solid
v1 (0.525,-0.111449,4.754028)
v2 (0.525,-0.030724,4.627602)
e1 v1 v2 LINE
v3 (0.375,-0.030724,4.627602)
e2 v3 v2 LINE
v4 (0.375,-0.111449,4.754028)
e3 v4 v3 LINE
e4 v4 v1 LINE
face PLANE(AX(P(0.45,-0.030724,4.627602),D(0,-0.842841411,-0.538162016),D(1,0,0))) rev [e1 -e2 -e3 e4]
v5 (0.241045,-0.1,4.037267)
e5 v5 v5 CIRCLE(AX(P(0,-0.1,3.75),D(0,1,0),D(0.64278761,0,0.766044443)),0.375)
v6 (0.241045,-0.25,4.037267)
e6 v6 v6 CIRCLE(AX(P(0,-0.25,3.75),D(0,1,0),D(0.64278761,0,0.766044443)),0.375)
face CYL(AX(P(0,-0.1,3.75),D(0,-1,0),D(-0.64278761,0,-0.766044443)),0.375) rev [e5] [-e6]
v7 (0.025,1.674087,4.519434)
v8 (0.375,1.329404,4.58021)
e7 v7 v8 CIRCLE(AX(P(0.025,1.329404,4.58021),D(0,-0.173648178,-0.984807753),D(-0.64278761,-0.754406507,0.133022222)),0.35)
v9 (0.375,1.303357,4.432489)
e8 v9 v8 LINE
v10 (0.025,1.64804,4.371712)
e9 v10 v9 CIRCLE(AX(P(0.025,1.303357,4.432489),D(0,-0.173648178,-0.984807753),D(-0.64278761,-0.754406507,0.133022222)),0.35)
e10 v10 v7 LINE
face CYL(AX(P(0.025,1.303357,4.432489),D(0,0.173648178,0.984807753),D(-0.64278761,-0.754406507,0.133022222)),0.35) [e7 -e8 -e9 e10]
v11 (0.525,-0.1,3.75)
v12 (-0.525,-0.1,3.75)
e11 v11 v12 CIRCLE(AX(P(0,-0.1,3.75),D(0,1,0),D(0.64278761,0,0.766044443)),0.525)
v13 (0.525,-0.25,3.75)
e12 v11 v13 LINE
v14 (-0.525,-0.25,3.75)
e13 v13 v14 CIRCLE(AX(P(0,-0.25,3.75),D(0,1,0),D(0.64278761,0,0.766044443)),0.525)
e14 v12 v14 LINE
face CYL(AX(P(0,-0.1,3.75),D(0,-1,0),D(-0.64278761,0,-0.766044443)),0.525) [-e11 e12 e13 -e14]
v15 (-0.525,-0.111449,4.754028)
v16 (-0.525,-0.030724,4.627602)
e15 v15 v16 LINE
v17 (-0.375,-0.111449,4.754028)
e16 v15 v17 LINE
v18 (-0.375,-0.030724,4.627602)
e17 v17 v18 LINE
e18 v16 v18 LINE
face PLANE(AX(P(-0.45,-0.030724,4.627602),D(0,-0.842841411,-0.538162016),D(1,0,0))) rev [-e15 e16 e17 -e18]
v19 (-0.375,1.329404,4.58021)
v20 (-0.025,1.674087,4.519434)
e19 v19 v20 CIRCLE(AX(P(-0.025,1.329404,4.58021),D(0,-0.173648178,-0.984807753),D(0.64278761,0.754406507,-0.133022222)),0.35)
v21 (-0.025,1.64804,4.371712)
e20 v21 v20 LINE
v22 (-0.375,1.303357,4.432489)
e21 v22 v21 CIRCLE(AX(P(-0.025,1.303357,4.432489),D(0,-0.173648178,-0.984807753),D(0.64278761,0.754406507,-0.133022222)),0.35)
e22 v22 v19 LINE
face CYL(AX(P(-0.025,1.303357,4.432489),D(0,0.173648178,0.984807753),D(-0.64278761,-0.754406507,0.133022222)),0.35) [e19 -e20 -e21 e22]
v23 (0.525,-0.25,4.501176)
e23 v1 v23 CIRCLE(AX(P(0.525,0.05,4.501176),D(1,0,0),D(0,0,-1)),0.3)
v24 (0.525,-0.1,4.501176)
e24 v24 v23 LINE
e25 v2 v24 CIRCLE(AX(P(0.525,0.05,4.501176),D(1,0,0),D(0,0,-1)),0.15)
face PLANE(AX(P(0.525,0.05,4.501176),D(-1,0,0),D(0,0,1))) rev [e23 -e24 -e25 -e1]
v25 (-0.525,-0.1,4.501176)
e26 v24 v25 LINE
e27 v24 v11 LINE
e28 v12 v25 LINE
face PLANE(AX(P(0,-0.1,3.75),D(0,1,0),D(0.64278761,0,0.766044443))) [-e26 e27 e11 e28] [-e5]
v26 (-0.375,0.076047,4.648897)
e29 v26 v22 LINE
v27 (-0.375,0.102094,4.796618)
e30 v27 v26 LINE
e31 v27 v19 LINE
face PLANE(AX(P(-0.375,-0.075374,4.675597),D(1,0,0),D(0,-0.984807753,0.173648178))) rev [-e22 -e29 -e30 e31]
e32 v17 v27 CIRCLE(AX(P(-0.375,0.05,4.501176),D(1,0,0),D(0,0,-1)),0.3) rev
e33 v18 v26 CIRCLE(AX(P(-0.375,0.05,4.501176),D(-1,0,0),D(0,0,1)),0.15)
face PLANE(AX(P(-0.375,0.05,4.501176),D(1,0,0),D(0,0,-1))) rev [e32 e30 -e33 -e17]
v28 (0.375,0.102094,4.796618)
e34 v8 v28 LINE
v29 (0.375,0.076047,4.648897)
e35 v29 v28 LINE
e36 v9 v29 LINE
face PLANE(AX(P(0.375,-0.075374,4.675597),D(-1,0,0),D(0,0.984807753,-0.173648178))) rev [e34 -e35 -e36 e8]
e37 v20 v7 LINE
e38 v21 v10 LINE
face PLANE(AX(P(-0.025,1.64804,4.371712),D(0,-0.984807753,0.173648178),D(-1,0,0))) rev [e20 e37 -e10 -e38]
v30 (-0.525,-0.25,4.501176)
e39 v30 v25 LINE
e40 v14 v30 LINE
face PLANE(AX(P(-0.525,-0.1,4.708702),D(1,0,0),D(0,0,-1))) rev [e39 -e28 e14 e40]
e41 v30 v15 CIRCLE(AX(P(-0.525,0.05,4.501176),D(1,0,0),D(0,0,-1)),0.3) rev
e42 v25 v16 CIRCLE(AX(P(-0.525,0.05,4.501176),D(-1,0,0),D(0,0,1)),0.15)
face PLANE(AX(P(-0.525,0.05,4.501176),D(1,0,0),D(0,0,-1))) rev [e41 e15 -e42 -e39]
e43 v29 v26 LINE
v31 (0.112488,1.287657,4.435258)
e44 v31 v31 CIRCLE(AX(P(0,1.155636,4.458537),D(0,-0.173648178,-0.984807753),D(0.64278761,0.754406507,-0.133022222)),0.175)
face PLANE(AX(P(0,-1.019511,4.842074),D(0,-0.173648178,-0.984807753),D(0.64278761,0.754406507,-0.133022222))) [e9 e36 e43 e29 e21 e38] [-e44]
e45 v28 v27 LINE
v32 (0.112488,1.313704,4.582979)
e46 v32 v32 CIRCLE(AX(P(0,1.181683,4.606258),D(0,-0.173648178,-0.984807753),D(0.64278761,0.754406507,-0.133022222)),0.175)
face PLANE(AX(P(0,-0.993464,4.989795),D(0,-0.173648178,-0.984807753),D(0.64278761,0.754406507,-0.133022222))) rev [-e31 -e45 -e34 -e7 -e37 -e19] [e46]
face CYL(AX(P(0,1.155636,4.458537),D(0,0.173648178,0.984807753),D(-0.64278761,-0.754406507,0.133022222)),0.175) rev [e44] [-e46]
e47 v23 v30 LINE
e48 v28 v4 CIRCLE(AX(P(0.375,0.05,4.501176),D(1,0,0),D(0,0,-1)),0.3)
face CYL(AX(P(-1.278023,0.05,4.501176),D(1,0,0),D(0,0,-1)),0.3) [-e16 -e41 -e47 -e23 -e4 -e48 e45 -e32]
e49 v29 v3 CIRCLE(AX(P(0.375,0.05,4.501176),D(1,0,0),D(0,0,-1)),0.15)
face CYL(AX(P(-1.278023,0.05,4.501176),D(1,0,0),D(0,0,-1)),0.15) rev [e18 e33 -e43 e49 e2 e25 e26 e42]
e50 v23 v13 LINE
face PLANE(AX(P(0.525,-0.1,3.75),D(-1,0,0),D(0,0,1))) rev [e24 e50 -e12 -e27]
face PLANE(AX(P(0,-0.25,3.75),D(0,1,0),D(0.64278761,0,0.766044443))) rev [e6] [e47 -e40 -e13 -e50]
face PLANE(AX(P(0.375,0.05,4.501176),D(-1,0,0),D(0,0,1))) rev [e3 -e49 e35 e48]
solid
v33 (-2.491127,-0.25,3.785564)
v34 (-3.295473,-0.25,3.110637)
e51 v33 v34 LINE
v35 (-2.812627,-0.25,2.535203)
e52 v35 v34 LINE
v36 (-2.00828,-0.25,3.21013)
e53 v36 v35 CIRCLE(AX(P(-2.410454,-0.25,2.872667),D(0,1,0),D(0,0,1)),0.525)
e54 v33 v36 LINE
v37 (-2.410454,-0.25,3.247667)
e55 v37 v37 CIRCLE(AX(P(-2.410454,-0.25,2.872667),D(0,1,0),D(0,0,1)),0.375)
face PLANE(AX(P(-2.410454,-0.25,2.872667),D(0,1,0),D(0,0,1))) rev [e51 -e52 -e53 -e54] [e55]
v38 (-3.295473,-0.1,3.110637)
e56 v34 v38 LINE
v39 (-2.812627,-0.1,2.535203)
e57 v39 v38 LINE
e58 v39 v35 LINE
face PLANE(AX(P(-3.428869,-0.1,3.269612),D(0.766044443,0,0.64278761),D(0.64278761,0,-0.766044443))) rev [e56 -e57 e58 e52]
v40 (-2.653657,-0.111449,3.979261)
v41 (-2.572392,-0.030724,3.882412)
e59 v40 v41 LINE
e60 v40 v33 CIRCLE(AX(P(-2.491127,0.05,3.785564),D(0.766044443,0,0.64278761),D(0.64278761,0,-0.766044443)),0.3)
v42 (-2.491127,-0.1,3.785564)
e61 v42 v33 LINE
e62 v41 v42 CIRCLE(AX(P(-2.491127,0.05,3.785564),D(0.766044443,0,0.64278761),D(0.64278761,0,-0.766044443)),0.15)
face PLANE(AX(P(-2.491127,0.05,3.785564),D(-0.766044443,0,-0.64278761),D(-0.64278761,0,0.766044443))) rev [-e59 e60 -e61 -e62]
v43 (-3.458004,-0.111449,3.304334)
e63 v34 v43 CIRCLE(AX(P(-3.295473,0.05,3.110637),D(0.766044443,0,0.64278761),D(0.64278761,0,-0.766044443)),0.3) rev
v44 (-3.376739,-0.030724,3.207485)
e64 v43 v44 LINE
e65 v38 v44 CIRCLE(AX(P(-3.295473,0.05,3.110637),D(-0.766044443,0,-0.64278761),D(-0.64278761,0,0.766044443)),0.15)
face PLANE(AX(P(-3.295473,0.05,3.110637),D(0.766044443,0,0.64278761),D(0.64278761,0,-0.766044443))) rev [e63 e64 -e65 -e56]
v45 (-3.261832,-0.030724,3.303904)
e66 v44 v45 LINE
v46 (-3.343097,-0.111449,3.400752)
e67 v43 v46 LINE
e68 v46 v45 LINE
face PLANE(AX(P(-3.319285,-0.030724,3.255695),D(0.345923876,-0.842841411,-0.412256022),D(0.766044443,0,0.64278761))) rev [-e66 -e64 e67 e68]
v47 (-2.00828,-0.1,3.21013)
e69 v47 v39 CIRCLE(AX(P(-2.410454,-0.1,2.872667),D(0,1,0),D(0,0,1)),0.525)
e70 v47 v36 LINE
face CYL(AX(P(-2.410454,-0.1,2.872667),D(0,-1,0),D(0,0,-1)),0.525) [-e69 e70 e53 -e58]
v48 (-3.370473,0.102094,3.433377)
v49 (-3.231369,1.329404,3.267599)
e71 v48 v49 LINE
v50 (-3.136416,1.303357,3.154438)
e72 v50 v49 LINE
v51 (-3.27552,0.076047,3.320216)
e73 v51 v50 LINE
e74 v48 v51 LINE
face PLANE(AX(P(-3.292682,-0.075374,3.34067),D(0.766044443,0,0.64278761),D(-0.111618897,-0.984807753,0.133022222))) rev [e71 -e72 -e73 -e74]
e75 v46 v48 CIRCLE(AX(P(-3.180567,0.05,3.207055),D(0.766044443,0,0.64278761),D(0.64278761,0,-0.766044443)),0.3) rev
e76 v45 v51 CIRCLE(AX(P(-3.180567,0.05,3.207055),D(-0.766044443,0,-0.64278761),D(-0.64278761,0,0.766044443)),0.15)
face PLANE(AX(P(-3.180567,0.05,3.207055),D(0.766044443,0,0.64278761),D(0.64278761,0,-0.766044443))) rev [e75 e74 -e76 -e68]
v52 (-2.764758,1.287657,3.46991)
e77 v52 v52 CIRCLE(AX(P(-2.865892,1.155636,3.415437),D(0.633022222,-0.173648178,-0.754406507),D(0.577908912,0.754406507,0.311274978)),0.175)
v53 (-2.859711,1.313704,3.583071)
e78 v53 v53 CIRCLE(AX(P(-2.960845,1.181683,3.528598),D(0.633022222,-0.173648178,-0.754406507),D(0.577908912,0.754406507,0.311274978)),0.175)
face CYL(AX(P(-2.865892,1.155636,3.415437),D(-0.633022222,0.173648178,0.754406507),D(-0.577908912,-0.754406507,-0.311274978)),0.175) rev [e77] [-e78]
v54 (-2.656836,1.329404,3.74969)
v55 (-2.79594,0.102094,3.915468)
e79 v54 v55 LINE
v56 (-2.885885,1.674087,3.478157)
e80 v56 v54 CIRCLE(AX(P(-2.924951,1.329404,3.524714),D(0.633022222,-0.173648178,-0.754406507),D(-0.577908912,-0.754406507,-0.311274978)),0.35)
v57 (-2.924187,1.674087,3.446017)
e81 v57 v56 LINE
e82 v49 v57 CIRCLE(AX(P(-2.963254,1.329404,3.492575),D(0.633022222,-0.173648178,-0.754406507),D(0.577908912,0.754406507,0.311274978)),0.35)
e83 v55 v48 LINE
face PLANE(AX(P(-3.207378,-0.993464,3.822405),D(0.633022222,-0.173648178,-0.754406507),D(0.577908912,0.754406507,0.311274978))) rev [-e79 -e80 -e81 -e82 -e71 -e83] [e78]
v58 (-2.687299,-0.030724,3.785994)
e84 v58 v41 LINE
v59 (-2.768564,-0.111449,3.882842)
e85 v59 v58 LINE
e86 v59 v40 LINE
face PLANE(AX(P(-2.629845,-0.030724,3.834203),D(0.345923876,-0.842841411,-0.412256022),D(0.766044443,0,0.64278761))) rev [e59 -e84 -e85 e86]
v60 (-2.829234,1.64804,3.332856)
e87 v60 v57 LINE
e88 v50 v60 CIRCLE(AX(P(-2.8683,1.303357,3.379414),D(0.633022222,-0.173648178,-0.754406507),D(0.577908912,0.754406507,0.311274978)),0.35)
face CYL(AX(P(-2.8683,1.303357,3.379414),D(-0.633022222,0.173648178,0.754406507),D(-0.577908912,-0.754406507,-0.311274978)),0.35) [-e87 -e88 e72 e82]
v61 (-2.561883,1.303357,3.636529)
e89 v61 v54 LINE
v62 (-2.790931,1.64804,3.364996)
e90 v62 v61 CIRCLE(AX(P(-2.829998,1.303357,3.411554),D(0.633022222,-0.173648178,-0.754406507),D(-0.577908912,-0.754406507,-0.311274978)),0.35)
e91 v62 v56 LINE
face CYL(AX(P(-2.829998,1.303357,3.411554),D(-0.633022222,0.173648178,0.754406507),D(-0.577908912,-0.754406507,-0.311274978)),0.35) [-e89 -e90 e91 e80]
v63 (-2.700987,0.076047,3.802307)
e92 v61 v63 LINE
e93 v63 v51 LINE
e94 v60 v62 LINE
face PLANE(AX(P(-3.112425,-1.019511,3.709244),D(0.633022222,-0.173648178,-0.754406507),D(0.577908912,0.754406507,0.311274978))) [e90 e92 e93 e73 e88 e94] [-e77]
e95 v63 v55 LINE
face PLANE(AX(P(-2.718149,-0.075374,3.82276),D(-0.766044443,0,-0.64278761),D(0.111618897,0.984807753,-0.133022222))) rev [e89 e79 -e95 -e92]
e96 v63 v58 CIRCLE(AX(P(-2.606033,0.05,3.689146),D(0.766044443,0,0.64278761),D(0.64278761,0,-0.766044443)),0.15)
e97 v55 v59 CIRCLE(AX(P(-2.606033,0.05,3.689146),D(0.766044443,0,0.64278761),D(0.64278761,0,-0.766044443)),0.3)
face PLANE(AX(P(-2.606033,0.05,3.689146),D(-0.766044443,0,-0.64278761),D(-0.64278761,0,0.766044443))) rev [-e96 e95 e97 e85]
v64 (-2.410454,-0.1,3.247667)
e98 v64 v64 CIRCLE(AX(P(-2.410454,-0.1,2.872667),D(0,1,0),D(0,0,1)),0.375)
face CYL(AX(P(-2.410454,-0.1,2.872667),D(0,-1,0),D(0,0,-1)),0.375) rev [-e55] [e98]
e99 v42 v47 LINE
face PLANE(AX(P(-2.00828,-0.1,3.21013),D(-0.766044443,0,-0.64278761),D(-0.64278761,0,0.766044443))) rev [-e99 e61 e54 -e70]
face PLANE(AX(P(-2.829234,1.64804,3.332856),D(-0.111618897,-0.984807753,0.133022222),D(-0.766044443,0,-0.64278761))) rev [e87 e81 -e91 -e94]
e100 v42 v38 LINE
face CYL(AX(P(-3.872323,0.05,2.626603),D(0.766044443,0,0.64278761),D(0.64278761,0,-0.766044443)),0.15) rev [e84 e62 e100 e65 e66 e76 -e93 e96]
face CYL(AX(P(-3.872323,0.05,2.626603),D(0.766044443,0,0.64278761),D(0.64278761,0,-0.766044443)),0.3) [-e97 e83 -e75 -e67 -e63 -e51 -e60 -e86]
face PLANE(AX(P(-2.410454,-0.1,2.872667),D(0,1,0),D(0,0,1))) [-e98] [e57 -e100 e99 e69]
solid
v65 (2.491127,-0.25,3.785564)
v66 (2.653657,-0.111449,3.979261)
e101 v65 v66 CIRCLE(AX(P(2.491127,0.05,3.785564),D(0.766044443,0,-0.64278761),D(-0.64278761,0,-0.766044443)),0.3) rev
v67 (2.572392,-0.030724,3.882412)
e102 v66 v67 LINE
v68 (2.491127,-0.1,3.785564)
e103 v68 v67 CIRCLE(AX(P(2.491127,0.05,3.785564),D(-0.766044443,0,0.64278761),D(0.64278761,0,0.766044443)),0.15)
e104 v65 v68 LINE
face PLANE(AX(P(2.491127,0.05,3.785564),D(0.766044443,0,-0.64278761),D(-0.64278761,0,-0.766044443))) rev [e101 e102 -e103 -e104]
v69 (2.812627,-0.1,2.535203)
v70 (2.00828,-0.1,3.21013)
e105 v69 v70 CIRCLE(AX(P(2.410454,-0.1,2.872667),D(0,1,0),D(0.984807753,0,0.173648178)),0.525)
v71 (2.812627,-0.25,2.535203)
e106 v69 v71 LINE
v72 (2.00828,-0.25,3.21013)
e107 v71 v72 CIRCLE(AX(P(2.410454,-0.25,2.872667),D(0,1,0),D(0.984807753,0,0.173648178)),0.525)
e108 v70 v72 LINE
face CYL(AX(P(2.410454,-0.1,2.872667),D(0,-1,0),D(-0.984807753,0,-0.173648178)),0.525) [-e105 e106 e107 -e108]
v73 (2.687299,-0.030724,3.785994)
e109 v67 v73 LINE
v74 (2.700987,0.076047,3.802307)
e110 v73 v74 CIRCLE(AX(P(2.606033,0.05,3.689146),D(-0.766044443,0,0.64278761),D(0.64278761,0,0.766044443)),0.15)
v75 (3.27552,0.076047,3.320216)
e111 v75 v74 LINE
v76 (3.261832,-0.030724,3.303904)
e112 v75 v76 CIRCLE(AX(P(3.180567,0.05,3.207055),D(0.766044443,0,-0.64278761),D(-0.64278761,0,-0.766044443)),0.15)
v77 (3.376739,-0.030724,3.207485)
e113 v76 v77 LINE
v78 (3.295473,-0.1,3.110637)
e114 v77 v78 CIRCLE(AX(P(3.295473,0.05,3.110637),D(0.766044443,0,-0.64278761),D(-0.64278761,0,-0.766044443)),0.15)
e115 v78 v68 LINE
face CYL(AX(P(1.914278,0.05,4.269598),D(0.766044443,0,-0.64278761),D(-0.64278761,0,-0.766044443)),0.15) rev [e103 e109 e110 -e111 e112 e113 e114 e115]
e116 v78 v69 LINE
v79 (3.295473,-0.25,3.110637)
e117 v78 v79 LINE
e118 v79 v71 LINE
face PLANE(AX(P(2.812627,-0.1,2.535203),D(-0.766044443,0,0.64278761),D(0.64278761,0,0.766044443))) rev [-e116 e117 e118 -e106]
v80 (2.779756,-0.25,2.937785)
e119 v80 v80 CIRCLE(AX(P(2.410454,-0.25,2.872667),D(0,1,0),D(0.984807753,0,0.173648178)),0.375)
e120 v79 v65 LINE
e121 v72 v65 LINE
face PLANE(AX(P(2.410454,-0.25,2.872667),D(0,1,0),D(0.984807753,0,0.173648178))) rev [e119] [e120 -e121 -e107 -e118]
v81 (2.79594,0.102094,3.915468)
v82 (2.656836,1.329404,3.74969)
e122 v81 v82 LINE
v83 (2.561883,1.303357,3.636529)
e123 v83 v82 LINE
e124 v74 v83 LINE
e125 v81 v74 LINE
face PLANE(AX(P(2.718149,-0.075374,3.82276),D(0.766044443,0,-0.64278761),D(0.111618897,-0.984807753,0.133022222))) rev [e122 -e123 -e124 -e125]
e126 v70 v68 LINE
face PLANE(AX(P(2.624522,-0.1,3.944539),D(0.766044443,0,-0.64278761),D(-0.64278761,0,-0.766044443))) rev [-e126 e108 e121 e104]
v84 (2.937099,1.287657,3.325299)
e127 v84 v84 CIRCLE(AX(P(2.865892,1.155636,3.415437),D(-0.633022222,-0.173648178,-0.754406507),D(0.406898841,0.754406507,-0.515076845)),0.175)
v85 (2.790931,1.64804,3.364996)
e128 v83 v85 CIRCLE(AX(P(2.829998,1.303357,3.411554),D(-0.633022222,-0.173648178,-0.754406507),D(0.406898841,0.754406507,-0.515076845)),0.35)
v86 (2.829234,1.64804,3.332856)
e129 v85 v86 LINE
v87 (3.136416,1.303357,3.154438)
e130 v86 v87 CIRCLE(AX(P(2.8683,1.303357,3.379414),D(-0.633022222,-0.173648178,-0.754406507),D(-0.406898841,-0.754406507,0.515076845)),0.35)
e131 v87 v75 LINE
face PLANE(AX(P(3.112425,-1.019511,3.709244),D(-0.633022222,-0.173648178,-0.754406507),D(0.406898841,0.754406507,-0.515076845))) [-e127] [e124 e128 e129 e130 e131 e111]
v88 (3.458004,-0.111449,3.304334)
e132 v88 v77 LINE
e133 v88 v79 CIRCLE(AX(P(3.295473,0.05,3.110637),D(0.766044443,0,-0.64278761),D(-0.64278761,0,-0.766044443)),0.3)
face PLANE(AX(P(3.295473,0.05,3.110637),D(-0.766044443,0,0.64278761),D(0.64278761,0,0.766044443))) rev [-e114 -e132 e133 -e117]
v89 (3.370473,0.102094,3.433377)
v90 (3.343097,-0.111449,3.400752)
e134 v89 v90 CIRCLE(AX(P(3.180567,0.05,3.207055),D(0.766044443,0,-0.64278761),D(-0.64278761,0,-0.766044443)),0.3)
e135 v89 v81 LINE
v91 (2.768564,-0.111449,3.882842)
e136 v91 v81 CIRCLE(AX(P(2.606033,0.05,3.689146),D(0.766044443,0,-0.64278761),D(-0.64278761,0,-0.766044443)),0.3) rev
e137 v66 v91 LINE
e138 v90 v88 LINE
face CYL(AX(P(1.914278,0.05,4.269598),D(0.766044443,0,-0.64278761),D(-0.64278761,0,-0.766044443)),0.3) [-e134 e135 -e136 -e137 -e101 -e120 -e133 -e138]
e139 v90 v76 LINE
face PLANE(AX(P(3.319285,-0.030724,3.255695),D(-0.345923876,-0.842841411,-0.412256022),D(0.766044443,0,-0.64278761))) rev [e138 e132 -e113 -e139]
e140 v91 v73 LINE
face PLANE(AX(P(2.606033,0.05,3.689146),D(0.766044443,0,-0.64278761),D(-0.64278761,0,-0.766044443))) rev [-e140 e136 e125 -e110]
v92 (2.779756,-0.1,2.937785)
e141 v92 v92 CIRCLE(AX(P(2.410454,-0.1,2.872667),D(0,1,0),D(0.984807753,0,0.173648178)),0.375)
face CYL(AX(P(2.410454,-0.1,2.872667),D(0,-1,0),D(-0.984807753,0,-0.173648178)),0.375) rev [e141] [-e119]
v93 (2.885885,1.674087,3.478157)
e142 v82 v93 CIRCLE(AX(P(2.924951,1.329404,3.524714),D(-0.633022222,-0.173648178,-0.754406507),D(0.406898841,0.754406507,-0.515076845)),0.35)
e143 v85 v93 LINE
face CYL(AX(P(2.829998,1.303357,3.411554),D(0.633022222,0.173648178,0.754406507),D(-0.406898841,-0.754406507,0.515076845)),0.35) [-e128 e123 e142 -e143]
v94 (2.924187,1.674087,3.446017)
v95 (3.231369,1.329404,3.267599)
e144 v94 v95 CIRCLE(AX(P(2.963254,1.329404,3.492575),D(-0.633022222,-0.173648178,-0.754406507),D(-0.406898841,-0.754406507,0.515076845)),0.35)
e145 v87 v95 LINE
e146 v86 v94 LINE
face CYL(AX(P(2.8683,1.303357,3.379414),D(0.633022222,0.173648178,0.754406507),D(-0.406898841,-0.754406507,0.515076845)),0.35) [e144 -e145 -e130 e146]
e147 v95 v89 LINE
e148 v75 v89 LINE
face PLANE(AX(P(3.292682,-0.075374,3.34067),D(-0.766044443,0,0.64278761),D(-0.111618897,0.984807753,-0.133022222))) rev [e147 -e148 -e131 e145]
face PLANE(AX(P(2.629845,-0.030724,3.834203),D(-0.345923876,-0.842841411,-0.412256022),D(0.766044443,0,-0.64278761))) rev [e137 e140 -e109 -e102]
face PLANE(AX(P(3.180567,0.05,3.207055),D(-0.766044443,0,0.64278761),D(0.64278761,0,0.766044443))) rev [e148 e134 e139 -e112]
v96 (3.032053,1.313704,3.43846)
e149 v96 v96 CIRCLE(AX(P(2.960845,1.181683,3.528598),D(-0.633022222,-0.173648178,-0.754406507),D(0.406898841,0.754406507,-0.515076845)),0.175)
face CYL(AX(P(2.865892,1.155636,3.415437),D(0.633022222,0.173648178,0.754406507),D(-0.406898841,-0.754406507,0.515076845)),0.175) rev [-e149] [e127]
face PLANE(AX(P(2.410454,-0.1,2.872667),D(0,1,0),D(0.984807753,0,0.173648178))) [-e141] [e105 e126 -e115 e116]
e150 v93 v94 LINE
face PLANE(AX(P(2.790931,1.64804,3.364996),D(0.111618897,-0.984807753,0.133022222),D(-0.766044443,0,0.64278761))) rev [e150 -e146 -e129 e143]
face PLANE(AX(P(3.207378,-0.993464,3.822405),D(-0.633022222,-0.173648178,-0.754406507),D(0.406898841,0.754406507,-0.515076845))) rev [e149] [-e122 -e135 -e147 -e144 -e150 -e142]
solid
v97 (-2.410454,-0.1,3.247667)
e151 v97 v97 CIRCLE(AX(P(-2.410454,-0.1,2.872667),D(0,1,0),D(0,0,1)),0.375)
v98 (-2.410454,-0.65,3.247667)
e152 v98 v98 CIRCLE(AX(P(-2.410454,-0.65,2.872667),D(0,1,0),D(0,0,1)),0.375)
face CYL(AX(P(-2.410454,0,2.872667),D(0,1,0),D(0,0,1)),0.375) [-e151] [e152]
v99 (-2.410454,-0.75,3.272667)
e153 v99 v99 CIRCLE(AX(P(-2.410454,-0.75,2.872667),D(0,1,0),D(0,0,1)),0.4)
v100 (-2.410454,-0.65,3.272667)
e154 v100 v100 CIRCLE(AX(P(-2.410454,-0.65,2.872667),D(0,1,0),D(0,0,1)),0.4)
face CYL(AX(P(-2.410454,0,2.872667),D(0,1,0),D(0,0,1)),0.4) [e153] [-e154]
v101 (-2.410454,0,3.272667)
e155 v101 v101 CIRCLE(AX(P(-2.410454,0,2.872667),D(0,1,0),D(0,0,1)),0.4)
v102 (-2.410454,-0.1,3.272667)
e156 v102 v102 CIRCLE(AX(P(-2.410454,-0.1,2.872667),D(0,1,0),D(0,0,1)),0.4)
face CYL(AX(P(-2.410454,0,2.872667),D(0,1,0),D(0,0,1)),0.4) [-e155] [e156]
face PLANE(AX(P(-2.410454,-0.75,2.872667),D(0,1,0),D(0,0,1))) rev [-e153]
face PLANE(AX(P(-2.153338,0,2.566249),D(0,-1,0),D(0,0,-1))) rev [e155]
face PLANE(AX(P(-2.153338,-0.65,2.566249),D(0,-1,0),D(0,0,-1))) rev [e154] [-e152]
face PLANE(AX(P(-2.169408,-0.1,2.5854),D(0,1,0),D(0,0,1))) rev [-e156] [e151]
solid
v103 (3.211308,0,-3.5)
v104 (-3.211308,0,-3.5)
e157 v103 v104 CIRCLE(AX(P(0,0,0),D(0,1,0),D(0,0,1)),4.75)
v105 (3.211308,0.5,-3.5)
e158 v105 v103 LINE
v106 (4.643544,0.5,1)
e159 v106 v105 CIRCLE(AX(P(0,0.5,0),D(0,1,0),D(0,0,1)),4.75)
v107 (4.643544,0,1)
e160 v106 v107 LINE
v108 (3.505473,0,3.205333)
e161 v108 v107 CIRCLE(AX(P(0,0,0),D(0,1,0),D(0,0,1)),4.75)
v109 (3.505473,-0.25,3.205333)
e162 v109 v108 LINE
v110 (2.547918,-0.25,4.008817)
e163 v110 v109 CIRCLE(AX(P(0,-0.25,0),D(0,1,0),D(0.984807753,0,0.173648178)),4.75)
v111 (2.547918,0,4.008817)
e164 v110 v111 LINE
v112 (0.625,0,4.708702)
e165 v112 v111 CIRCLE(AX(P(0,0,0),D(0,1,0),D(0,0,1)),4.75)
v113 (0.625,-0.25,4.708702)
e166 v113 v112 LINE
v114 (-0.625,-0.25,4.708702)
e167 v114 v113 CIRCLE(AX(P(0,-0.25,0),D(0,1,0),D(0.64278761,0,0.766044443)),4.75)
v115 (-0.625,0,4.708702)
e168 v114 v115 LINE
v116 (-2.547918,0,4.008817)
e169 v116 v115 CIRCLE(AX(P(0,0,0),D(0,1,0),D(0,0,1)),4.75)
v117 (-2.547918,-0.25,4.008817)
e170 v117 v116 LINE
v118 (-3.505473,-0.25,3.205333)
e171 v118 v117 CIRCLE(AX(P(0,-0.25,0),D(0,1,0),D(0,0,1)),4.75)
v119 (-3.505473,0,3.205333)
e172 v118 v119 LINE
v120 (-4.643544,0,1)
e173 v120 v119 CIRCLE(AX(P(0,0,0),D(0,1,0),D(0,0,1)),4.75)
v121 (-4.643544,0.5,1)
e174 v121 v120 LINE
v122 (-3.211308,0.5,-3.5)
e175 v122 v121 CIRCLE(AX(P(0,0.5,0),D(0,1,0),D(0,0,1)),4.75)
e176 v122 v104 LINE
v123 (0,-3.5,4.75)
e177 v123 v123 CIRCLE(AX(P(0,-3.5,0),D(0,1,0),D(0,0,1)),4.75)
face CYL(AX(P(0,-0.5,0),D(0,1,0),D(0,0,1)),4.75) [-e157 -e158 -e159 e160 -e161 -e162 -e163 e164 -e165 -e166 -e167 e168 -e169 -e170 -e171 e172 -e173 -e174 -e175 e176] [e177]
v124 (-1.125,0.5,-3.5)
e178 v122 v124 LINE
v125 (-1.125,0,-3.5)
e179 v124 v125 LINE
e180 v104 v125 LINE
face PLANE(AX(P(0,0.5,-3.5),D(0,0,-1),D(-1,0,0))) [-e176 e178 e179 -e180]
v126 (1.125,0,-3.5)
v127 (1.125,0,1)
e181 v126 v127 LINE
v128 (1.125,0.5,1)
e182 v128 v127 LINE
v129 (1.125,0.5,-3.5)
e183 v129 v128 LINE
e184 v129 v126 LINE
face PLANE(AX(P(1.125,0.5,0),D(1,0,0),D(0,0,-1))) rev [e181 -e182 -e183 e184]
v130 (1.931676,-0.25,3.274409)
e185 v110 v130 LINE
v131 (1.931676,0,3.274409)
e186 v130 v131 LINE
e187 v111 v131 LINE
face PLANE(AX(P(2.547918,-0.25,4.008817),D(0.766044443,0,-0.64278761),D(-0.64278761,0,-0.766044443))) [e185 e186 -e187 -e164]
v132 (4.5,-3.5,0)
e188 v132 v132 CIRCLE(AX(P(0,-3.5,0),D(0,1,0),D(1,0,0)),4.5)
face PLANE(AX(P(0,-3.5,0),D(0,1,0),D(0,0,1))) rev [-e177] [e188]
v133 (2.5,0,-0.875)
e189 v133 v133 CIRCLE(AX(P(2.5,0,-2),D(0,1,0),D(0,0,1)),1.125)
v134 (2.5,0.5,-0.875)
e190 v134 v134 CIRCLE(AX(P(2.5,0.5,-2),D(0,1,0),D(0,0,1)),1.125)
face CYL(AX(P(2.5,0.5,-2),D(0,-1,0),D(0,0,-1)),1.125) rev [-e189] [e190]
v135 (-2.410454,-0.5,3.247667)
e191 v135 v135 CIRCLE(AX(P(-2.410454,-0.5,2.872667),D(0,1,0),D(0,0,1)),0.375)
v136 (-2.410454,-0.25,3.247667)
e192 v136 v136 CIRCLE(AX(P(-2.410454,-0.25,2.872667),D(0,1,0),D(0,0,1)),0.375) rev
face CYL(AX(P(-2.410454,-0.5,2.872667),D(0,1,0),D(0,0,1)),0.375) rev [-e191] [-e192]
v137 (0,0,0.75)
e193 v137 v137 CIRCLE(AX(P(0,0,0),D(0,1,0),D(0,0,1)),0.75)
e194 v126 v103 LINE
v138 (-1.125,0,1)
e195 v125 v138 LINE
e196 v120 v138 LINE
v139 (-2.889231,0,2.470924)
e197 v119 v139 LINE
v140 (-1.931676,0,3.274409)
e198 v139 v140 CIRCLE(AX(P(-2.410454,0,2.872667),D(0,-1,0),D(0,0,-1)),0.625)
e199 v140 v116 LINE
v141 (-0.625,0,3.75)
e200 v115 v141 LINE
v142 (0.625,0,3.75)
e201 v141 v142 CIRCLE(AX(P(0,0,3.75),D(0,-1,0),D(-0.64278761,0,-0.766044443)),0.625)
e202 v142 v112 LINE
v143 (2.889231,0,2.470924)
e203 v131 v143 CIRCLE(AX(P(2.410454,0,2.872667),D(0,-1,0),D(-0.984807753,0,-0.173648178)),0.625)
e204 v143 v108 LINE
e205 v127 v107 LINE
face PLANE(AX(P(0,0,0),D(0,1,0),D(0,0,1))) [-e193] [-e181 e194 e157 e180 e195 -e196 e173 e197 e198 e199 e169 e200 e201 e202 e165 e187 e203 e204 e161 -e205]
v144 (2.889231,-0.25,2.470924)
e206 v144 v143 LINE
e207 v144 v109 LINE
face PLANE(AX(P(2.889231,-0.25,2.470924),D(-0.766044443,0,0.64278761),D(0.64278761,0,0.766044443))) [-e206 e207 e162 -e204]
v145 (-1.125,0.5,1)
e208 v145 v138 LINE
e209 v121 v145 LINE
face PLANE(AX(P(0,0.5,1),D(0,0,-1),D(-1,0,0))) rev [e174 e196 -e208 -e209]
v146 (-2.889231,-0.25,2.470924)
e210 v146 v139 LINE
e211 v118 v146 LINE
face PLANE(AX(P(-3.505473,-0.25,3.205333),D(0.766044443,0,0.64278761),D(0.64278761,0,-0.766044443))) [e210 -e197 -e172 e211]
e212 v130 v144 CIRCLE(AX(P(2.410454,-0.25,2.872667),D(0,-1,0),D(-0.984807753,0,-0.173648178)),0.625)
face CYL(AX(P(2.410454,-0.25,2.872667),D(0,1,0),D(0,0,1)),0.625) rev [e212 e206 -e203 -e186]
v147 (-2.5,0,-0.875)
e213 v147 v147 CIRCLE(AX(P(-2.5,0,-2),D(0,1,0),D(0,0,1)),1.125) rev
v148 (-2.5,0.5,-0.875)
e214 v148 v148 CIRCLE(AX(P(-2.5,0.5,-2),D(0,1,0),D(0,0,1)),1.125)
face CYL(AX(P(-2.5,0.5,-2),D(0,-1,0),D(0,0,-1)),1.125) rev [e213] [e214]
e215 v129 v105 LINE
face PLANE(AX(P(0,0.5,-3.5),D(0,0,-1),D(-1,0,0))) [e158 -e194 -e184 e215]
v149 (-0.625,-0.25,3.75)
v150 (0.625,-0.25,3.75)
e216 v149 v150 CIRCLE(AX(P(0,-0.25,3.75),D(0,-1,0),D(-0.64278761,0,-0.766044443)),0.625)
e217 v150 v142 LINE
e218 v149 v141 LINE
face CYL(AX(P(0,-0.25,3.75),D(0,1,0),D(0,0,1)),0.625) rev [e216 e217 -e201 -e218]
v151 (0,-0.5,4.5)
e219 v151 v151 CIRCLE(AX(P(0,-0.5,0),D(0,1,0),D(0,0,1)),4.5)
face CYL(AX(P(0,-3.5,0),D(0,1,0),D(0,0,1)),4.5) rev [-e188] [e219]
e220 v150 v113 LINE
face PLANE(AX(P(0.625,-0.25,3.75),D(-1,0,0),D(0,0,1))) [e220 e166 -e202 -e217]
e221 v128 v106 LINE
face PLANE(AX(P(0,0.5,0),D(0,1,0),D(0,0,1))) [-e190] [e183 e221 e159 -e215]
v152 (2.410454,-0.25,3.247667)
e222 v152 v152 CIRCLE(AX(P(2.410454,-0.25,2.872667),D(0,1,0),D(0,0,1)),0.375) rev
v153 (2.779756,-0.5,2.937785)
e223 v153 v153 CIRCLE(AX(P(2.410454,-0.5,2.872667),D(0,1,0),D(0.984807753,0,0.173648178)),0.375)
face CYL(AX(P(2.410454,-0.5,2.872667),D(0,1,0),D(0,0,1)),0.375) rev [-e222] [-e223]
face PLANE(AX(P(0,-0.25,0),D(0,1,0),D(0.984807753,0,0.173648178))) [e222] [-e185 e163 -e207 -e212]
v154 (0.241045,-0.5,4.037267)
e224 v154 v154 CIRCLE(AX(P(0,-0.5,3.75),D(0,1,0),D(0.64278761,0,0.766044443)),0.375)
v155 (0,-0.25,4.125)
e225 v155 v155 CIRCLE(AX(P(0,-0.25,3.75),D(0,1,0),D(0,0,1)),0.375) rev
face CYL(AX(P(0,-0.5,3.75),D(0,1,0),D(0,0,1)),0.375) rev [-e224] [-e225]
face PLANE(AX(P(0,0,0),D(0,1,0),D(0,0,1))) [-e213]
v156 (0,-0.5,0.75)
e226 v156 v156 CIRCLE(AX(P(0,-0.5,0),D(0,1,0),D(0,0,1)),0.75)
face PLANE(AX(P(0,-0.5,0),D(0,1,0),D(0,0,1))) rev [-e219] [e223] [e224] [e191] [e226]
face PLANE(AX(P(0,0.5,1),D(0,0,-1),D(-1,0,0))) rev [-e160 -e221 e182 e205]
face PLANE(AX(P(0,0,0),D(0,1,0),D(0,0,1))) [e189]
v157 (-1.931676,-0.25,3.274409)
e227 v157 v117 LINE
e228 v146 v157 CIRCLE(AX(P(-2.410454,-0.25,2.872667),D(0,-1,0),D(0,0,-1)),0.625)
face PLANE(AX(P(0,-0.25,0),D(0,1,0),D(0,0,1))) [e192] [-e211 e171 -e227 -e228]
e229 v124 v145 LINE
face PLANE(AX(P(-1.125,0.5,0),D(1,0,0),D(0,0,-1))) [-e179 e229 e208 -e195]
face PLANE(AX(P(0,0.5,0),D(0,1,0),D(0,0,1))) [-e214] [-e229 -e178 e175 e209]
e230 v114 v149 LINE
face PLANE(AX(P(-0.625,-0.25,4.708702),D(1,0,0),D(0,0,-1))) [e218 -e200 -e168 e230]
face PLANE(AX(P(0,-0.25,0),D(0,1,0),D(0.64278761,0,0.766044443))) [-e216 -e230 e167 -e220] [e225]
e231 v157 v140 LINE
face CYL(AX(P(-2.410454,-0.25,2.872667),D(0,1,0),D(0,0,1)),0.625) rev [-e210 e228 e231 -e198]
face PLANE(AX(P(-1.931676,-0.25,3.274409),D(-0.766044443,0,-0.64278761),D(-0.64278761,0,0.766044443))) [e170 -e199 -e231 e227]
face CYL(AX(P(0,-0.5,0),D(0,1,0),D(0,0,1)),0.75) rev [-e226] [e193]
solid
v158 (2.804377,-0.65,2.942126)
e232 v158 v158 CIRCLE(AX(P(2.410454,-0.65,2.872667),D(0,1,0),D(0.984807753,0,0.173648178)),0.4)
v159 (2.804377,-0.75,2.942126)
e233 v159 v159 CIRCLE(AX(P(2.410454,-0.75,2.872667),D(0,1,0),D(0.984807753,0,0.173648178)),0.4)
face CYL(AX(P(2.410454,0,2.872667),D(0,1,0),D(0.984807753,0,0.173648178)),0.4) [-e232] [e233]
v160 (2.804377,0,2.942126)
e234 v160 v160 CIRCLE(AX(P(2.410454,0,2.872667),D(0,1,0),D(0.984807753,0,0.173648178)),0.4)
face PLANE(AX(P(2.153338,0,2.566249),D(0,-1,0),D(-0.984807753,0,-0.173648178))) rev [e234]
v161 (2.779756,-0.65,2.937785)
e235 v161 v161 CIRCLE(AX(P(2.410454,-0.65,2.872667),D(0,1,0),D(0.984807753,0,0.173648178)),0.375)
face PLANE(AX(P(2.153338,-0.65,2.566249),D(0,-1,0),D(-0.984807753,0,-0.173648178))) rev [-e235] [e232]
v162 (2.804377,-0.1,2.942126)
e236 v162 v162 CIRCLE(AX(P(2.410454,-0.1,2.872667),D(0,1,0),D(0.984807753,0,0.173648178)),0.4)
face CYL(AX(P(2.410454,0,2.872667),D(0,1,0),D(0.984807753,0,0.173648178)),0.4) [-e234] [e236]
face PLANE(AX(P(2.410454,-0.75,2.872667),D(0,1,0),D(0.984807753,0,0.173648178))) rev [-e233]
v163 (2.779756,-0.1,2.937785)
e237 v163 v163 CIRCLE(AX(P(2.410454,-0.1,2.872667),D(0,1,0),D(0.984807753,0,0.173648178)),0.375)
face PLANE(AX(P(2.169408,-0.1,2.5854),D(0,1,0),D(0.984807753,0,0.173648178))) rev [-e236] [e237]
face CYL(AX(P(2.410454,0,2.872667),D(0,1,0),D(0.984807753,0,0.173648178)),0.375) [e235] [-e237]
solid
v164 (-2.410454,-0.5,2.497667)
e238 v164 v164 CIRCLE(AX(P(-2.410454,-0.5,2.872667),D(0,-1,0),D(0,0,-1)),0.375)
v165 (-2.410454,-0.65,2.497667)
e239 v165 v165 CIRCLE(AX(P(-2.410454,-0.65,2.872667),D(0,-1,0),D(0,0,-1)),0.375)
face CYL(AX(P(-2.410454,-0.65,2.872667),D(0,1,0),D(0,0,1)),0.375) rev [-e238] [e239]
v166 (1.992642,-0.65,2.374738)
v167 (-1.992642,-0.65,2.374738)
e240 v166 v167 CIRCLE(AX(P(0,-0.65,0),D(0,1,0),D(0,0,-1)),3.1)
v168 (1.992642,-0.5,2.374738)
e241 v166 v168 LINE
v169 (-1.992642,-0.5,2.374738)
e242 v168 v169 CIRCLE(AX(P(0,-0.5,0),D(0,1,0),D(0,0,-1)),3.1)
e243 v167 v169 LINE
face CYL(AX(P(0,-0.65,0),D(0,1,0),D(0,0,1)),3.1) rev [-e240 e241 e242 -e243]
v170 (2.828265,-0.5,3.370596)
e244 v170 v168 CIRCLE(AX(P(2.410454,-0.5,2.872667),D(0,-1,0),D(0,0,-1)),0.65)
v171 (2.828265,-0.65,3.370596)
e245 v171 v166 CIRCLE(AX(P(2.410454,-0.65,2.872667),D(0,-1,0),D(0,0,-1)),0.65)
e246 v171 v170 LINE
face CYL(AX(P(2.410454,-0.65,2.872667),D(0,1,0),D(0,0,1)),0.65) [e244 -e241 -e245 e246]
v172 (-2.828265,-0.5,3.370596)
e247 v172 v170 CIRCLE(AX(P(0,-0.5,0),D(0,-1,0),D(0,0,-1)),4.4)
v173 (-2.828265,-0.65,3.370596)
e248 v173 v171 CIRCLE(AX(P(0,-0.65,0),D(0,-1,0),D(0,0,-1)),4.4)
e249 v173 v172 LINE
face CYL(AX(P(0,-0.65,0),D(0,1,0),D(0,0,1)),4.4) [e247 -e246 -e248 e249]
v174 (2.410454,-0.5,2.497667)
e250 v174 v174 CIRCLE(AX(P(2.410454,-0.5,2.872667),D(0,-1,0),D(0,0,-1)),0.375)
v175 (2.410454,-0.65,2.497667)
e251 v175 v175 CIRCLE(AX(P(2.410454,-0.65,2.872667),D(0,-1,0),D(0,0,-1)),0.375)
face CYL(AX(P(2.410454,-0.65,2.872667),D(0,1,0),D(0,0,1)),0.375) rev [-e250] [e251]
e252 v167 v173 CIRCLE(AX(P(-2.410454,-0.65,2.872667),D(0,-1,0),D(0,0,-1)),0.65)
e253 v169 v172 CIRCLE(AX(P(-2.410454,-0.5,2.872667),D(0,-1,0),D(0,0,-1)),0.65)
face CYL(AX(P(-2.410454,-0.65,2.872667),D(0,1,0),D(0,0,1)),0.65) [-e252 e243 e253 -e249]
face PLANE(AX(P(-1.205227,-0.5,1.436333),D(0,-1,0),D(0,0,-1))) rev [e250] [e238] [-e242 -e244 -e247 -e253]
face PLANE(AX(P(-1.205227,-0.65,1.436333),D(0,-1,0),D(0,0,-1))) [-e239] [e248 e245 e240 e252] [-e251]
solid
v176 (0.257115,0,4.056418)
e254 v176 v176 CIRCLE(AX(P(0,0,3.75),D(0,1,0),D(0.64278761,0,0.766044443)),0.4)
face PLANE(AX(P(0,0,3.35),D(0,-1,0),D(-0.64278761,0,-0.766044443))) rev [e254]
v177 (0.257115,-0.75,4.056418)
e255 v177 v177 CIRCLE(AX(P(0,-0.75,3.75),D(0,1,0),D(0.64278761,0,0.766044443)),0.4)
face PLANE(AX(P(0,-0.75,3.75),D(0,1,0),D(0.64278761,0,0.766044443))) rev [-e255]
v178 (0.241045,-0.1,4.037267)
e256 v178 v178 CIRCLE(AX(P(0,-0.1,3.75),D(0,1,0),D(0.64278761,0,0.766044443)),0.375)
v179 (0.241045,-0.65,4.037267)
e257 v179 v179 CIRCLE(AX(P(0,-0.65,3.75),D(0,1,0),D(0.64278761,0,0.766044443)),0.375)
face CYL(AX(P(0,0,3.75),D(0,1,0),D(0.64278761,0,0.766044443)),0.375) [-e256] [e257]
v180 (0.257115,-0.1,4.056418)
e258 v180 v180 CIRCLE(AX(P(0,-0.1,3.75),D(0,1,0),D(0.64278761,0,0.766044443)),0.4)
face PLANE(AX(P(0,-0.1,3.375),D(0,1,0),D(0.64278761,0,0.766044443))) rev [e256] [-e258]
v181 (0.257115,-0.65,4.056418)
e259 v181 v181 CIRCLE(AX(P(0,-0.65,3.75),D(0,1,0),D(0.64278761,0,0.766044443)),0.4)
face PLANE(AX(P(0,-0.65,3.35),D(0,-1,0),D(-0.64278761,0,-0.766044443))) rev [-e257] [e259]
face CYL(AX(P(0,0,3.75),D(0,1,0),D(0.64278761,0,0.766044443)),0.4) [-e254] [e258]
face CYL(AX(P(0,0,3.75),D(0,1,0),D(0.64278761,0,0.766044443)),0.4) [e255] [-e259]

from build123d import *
from build123d.topology import SkipClean

# Parameters (mm, degrees)
SKETCH1_R                  = 4.75
SKETCH1_R_2                = 0.75
BOSS_EXTRUDE1_DEPTH        = 0.5
BOSS_EXTRUDE2_START        = 0.5
SKETCH1_3_R                = 1.125
BOSS_EXTRUDE2_DEPTH        = 0.5
SKETCH2_R                  = 0.375
CUT_EXTRUDE1_DEPTH         = 7.736096793
CUT_EXTRUDE2_DEPTH         = 0.25
CIRPATTERN1_COUNT          = 3
CIRPATTERN1_ANGLE          = 80
EXTRUDE_THIN1_START        = -0.5
SKETCH1_4_R                = 4.75
SKETCH1_4_R_2              = 4.5
EXTRUDE_THIN1_DEPTH        = 3
BASE_FLANGE1_START         = 0.15
SKETCH4_R                  = 0.175
SKETCH4_R_2                = 0.375
BASE_FLANGE1_DEPTH         = 0.15
SKETCHED_START             = -0.525
SKETCHED_BEND2_DEPTH       = 1.05
SKETCHED_BEND2_2_DEPTH     = 1.05
SKETCHED_START_2           = -0.375
SKETCHED_BEND2_3_DEPTH     = 0.75
SKETCHED_START_3           = -4.741475404
SKETCHED_BEND2_4_OUTLINE_R = 0.175
SKETCHED_BEND2_4_DEPTH     = 0.149999999
SKETCH13_R                 = 0.375
BASE_FLANGE2_DEPTH         = 0.15
CIRPATTERN2_COUNT          = 3
CIRPATTERN2_ANGLE          = 80


with BuildPart() as part:
    # Sketch1 → Boss-Extrude1 (new body)
    with BuildSketch(Plane(origin=(0, 0, 0), x_dir=(1, 0, 0), z_dir=(0, 1, 0))):
        with Locations(Location((0, 0, 0), (0, 0, 270))):
            Circle(SKETCH1_R)
        with Locations(Location((0, 0, 0), (0, 0, 270))):
            Circle(SKETCH1_R_2, mode=Mode.SUBTRACT)
    extrude(amount=-BOSS_EXTRUDE1_DEPTH)

    # Sketch1<3> → Boss-Extrude2 (add)
    # profile 1 of 2: a face of its own
    with BuildSketch(Plane(origin=(0, 0, 0), x_dir=(1, 0, 0), z_dir=(0, 1, 0)).offset(BOSS_EXTRUDE2_START)):
        with BuildLine():
            Line((1.125, -1), (4.643543905, -1))
            ThreePointArc((4.643543905, -1), (4.723310997, -0.502825243), (4.75, 0))
            ThreePointArc((4.75, 0), (4.348345299, 1.911646713), (3.211308145, 3.5))
            Line((3.211308145, 3.5), (1.125, 3.5))
            Line((1.125, 3.5), (1.125, -1))
        make_face()
        with Locations(Location((2.5, 2, 0), (0, 0, 270))):
            Circle(SKETCH1_3_R, mode=Mode.SUBTRACT)
    # profile 2 of 2: a face of its own
    with BuildSketch(Plane(origin=(0, 0, 0), x_dir=(1, 0, 0), z_dir=(0, 1, 0)).offset(BOSS_EXTRUDE2_START)):
        with BuildLine():
            ThreePointArc((-3.211308145, 3.5), (-4.526276083, 1.440598771), (-4.643543905, -1))
            Line((-4.643543905, -1), (-1.125, -1))
            Line((-1.125, -1), (-1.125, 3.5))
            Line((-1.125, 3.5), (-3.211308145, 3.5))
        make_face()
        with Locations(Location((-2.5, 2, 0), (0, 0, 270))):
            Circle(SKETCH1_3_R, mode=Mode.SUBTRACT)
    extrude(amount=-BOSS_EXTRUDE2_DEPTH)

    # Sketch2 → Cut-Extrude1 (cut, through all)
    with BuildSketch(Plane(origin=(0, 0, 0), x_dir=(1, 0, 0), z_dir=(0, 1, 0))):
        with Locations(Location((-2.410453536, -2.872666662, 0), (0, 0, 270))):
            Circle(SKETCH2_R)
    cut_extrude1 = extrude(amount=-CUT_EXTRUDE1_DEPTH, mode=Mode.SUBTRACT)

    # Sketch2<3> → Cut-Extrude2 (cut)
    with BuildSketch(Plane(origin=(0, 0, 0), x_dir=(1, 0, 0), z_dir=(0, 1, 0))):
        with BuildLine():
            Line((-3.505473113, -3.205332784), (-2.889231313, -2.470924406))
            ThreePointArc((-2.889231313, -2.470924406), (-2.00871128, -2.393888885), (-1.931675759, -3.274408918))
            Line((-1.931675759, -3.274408918), (-2.547917559, -4.008817296))
            ThreePointArc((-2.547917559, -4.008817296), (-3.053241146, -3.638711105), (-3.505473113, -3.205332784))
        make_face()
    cut_extrude2 = extrude(amount=-CUT_EXTRUDE2_DEPTH, mode=Mode.SUBTRACT)

    # CirPattern1: Cut-Extrude1, Cut-Extrude2 ×3 about axis
    cirpattern1_axis = Axis((0, 0, 0), (0, 1, 0))
    add([cut_extrude1.rotate(cirpattern1_axis, i * CIRPATTERN1_ANGLE / (CIRPATTERN1_COUNT - 1)) for i in range(1, CIRPATTERN1_COUNT)], mode=Mode.SUBTRACT)
    add([cut_extrude2.rotate(cirpattern1_axis, i * CIRPATTERN1_ANGLE / (CIRPATTERN1_COUNT - 1)) for i in range(1, CIRPATTERN1_COUNT)], mode=Mode.SUBTRACT)

    # Sketch1<4> → Extrude-Thin1 (add)
    with BuildSketch(Plane(origin=(0, 0, 0), x_dir=(1, 0, 0), z_dir=(0, 1, 0)).offset(EXTRUDE_THIN1_START)):
        Circle(SKETCH1_4_R)
        Circle(SKETCH1_4_R_2, mode=Mode.SUBTRACT)
    extrude(amount=-EXTRUDE_THIN1_DEPTH)


with BuildPart() as body_2:
    # Base-Flange1: sheet metal written as solids
    # Sketch4 → Base-Flange1 (new body)
    with BuildSketch(Plane(origin=(0, -0.25, 0), x_dir=(1, 0, 0), z_dir=(0, 1, 0)).offset(BASE_FLANGE1_START)):
        with BuildLine():
            Line((-3.428868668, -3.269611545), (-2.812626869, -2.535203167))
            ThreePointArc((-2.812626869, -2.535203167), (-2.072990041, -2.470493329), (-2.008280204, -3.210130157))
            Line((-2.008280204, -3.210130157), (-2.624522003, -3.944538535))
            Line((-2.624522003, -3.944538535), (-2.73942867, -3.848120394))
            Line((-2.73942867, -3.848120394), (-3.639331323, -4.920582614))
            ThreePointArc((-3.639331323, -4.920582614), (-3.876942368, -5.044275095), (-4.132422542, -4.963722506))
            Line((-4.132422542, -4.963722506), (-4.170724764, -4.931583125))
            ThreePointArc((-4.170724764, -4.931583125), (-4.294417245, -4.69397208), (-4.213864655, -4.438491907))
            Line((-4.213864655, -4.438491907), (-3.313962002, -3.366029686))
            Line((-3.313962002, -3.366029686), (-3.428868668, -3.269611545))
        make_face()
        with Locations(Location((-3.830179848, -4.564630594, 0), (0, 0, 270))):
            Circle(SKETCH4_R, mode=Mode.SUBTRACT)
        with Locations(Location((-2.410453536, -2.872666662, 0), (0, 0, 270))):
            Circle(SKETCH4_R_2, mode=Mode.SUBTRACT)
    extrude(amount=-BASE_FLANGE1_DEPTH)

    # Sketched Bend2: read off the stored shape, not the designer's step
    # Sketched Bend2 outline → Sketched Bend2 (cut)
    with BuildSketch(Plane(origin=(0, 0, 0), x_dir=(0.642787609686539, 0, -0.7660444431189782), z_dir=(0.7660444431189782, 0, 0.6427876096865391)).offset(SKETCHED_START)):
        with BuildLine():
            Line((-4.760983594, -0.1), (-6.45870205, -0.1))
            Line((-6.45870205, -0.1), (-6.45870205, -0.25))
            Line((-6.45870205, -0.25), (-4.501175973, -0.25))
            ThreePointArc((-4.501175973, -0.25), (-4.651175973, -0.209807621), (-4.760983594, -0.1))
        make_face()
    extrude(amount=SKETCHED_BEND2_DEPTH, mode=Mode.SUBTRACT)

    # Sketched Bend2 2 outline → Sketched Bend2 2 (add)
    with SkipClean():  # the faces are left unmerged after this step: merging them gives an invalid solid
        with BuildSketch(Plane(origin=(0, 0, 0), x_dir=(0.642787609686539, 0, -0.7660444431189782), z_dir=(0.7660444431189782, 0, 0.6427876096865391)).offset(SKETCHED_START)):
            with BuildLine():
                ThreePointArc((-4.501175973, -0.1), (-4.57325702, -0.081545895), (-4.627602184, -0.030724302))
                Line((-4.627602184, -0.030724302), (-4.754028396, -0.111448605))
                ThreePointArc((-4.754028396, -0.111448605), (-4.73301345, -0.140397963), (-4.70870205, -0.166640087))
                Line((-4.70870205, -0.166640087), (-4.70870205, -0.1))
                Line((-4.70870205, -0.1), (-4.501175973, -0.1))
            make_face()
        extrude(amount=SKETCHED_BEND2_2_DEPTH)

    # Sketched Bend2 3 outline → Sketched Bend2 3 (add)
    with SkipClean():  # the faces are left unmerged after this step: merging them gives an invalid solid
        with BuildSketch(Plane(origin=(0, 0, 0), x_dir=(0.642787609686539, 0, -0.7660444431189782), z_dir=(0.7660444431189782, 0, 0.6427876096865391)).offset(SKETCHED_START_2)):
            with BuildLine():
                ThreePointArc((-4.627602184, -0.030724302), (-4.648278779, 0.020661214), (-4.648897136, 0.076047227))
                Line((-4.648897136, 0.076047227), (-4.371712461, 1.648039633))
                Line((-4.371712461, 1.648039633), (-4.519433624, 1.674086859))
                Line((-4.519433624, 1.674086859), (-4.796618299, 0.102094453))
                ThreePointArc((-4.796618299, 0.102094453), (-4.796618299, -0.002094454), (-4.760983594, -0.1))
                Line((-4.760983594, -0.1), (-4.736098185, -0.1))
                Line((-4.736098185, -0.1), (-4.627602184, -0.030724302))
            make_face()
        extrude(amount=SKETCHED_BEND2_3_DEPTH)

    # Sketched Bend2 4 outline → Sketched Bend2 4 (cut)
    with SkipClean():  # the faces are left unmerged after this step: merging them gives an invalid solid
        with BuildSketch(Plane(origin=(0, 0, 0), x_dir=(0.774133623486211, 0.14199506630580708, 0.6168910228986306), z_dir=(0.633022221559488, -0.173648177666934, -0.754406506735489)).offset(SKETCHED_START_3)):
            with BuildLine():
                Line((-0.246525022, -0.908905109), (0.099817711, -0.858440159))
                ThreePointArc((0.099817711, -0.858440159), (-0.159864425, -0.792682829), (-0.296989971, -0.562562375))
                Line((-0.296989971, -0.562562375), (-0.246525022, -0.908905109))
            make_face()
            with BuildLine():
                ThreePointArc((0.445173029, -0.454423198), (0.379415699, -0.714105335), (0.149295245, -0.851230881))
                Line((0.149295245, -0.851230881), (0.495637978, -0.800765932))
                Line((0.495637978, -0.800765932), (0.445173029, -0.454423198))
            make_face()
            with Locations((0.052463694, -0.360060187)):
                Circle(SKETCHED_BEND2_4_OUTLINE_R)
        extrude(amount=SKETCHED_BEND2_4_DEPTH, mode=Mode.SUBTRACT)


with BuildPart() as body_3:
    # Base-Flange2: sheet metal written as solids
    # Sketch13 → Base-Flange2 (new body)
    with BuildSketch(Plane.XZ.offset(0.5)):
        with BuildLine():
            ThreePointArc((-2.828265483, 3.37059555), (0, -4.4), (2.828265483, 3.37059555))
            ThreePointArc((2.828265483, 3.37059555), (1.912524648, 3.290478608), (1.99264159, 2.374737774))
            ThreePointArc((1.99264159, 2.374737774), (0, -3.1), (-1.99264159, 2.374737774))
            ThreePointArc((-1.99264159, 2.374737774), (-1.912524648, 3.290478608), (-2.828265483, 3.37059555))
        make_face()
        with Locations(Location((-2.410453536, 2.872666662, 0), (0, 0, 270))):
            Circle(SKETCH13_R, mode=Mode.SUBTRACT)
        with Locations(Location((2.410453536, 2.872666662, 0), (0, 0, 270))):
            Circle(SKETCH13_R, mode=Mode.SUBTRACT)
    extrude(amount=BASE_FLANGE2_DEPTH)


with BuildPart() as body_4:
    # Sketch16 → Revolve1 (revolve)
    with BuildSketch(Plane(origin=(0, 0, 0), x_dir=(-0.6427876096865403, 0, 0.7660444431189773), z_dir=(-0.7660444431189773, 0, -0.6427876096865403)), mode=Mode.PRIVATE) as revolve1_sk:
        Polygon((3.375, -0.1), (3.35, -0.1), (3.35, 0), (3.75, 0), (3.75, -0.75), (3.35, -0.75), (3.35, -0.65), (3.375, -0.65), align=None)
    revolve(revolve1_sk.sketch.rotate(Axis((-2.410453536, 0, 2.872666662), (0, -1, 0)), 140), axis=Axis((-2.410453536, 0, 2.872666662), (0, -1, 0)))


with BuildPart() as cirpattern2_1:
    # CirPattern2: pattern copy
    add(body_4.part.rotate(Axis((0, 0, 0), (0, 1, 0)), 1 * CIRPATTERN2_ANGLE / (CIRPATTERN2_COUNT - 1)))


with BuildPart() as cirpattern2_2:
    # CirPattern2: pattern copy
    add(body_4.part.rotate(Axis((0, 0, 0), (0, 1, 0)), 2 * CIRPATTERN2_ANGLE / (CIRPATTERN2_COUNT - 1)))


with BuildPart() as cirpattern2_3:
    # CirPattern2: pattern copy
    add(body_2.part.rotate(Axis((0, 0, 0), (0, 1, 0)), 1 * CIRPATTERN2_ANGLE / (CIRPATTERN2_COUNT - 1)))


with BuildPart() as cirpattern2_4:
    # CirPattern2: pattern copy
    add(body_2.part.rotate(Axis((0, 0, 0), (0, 1, 0)), 2 * CIRPATTERN2_ANGLE / (CIRPATTERN2_COUNT - 1)))


solid = Compound([part.part, body_2.part, body_3.part, body_4.part, cirpattern2_1.part, cirpattern2_2.part, cirpattern2_3.part, cirpattern2_4.part])
